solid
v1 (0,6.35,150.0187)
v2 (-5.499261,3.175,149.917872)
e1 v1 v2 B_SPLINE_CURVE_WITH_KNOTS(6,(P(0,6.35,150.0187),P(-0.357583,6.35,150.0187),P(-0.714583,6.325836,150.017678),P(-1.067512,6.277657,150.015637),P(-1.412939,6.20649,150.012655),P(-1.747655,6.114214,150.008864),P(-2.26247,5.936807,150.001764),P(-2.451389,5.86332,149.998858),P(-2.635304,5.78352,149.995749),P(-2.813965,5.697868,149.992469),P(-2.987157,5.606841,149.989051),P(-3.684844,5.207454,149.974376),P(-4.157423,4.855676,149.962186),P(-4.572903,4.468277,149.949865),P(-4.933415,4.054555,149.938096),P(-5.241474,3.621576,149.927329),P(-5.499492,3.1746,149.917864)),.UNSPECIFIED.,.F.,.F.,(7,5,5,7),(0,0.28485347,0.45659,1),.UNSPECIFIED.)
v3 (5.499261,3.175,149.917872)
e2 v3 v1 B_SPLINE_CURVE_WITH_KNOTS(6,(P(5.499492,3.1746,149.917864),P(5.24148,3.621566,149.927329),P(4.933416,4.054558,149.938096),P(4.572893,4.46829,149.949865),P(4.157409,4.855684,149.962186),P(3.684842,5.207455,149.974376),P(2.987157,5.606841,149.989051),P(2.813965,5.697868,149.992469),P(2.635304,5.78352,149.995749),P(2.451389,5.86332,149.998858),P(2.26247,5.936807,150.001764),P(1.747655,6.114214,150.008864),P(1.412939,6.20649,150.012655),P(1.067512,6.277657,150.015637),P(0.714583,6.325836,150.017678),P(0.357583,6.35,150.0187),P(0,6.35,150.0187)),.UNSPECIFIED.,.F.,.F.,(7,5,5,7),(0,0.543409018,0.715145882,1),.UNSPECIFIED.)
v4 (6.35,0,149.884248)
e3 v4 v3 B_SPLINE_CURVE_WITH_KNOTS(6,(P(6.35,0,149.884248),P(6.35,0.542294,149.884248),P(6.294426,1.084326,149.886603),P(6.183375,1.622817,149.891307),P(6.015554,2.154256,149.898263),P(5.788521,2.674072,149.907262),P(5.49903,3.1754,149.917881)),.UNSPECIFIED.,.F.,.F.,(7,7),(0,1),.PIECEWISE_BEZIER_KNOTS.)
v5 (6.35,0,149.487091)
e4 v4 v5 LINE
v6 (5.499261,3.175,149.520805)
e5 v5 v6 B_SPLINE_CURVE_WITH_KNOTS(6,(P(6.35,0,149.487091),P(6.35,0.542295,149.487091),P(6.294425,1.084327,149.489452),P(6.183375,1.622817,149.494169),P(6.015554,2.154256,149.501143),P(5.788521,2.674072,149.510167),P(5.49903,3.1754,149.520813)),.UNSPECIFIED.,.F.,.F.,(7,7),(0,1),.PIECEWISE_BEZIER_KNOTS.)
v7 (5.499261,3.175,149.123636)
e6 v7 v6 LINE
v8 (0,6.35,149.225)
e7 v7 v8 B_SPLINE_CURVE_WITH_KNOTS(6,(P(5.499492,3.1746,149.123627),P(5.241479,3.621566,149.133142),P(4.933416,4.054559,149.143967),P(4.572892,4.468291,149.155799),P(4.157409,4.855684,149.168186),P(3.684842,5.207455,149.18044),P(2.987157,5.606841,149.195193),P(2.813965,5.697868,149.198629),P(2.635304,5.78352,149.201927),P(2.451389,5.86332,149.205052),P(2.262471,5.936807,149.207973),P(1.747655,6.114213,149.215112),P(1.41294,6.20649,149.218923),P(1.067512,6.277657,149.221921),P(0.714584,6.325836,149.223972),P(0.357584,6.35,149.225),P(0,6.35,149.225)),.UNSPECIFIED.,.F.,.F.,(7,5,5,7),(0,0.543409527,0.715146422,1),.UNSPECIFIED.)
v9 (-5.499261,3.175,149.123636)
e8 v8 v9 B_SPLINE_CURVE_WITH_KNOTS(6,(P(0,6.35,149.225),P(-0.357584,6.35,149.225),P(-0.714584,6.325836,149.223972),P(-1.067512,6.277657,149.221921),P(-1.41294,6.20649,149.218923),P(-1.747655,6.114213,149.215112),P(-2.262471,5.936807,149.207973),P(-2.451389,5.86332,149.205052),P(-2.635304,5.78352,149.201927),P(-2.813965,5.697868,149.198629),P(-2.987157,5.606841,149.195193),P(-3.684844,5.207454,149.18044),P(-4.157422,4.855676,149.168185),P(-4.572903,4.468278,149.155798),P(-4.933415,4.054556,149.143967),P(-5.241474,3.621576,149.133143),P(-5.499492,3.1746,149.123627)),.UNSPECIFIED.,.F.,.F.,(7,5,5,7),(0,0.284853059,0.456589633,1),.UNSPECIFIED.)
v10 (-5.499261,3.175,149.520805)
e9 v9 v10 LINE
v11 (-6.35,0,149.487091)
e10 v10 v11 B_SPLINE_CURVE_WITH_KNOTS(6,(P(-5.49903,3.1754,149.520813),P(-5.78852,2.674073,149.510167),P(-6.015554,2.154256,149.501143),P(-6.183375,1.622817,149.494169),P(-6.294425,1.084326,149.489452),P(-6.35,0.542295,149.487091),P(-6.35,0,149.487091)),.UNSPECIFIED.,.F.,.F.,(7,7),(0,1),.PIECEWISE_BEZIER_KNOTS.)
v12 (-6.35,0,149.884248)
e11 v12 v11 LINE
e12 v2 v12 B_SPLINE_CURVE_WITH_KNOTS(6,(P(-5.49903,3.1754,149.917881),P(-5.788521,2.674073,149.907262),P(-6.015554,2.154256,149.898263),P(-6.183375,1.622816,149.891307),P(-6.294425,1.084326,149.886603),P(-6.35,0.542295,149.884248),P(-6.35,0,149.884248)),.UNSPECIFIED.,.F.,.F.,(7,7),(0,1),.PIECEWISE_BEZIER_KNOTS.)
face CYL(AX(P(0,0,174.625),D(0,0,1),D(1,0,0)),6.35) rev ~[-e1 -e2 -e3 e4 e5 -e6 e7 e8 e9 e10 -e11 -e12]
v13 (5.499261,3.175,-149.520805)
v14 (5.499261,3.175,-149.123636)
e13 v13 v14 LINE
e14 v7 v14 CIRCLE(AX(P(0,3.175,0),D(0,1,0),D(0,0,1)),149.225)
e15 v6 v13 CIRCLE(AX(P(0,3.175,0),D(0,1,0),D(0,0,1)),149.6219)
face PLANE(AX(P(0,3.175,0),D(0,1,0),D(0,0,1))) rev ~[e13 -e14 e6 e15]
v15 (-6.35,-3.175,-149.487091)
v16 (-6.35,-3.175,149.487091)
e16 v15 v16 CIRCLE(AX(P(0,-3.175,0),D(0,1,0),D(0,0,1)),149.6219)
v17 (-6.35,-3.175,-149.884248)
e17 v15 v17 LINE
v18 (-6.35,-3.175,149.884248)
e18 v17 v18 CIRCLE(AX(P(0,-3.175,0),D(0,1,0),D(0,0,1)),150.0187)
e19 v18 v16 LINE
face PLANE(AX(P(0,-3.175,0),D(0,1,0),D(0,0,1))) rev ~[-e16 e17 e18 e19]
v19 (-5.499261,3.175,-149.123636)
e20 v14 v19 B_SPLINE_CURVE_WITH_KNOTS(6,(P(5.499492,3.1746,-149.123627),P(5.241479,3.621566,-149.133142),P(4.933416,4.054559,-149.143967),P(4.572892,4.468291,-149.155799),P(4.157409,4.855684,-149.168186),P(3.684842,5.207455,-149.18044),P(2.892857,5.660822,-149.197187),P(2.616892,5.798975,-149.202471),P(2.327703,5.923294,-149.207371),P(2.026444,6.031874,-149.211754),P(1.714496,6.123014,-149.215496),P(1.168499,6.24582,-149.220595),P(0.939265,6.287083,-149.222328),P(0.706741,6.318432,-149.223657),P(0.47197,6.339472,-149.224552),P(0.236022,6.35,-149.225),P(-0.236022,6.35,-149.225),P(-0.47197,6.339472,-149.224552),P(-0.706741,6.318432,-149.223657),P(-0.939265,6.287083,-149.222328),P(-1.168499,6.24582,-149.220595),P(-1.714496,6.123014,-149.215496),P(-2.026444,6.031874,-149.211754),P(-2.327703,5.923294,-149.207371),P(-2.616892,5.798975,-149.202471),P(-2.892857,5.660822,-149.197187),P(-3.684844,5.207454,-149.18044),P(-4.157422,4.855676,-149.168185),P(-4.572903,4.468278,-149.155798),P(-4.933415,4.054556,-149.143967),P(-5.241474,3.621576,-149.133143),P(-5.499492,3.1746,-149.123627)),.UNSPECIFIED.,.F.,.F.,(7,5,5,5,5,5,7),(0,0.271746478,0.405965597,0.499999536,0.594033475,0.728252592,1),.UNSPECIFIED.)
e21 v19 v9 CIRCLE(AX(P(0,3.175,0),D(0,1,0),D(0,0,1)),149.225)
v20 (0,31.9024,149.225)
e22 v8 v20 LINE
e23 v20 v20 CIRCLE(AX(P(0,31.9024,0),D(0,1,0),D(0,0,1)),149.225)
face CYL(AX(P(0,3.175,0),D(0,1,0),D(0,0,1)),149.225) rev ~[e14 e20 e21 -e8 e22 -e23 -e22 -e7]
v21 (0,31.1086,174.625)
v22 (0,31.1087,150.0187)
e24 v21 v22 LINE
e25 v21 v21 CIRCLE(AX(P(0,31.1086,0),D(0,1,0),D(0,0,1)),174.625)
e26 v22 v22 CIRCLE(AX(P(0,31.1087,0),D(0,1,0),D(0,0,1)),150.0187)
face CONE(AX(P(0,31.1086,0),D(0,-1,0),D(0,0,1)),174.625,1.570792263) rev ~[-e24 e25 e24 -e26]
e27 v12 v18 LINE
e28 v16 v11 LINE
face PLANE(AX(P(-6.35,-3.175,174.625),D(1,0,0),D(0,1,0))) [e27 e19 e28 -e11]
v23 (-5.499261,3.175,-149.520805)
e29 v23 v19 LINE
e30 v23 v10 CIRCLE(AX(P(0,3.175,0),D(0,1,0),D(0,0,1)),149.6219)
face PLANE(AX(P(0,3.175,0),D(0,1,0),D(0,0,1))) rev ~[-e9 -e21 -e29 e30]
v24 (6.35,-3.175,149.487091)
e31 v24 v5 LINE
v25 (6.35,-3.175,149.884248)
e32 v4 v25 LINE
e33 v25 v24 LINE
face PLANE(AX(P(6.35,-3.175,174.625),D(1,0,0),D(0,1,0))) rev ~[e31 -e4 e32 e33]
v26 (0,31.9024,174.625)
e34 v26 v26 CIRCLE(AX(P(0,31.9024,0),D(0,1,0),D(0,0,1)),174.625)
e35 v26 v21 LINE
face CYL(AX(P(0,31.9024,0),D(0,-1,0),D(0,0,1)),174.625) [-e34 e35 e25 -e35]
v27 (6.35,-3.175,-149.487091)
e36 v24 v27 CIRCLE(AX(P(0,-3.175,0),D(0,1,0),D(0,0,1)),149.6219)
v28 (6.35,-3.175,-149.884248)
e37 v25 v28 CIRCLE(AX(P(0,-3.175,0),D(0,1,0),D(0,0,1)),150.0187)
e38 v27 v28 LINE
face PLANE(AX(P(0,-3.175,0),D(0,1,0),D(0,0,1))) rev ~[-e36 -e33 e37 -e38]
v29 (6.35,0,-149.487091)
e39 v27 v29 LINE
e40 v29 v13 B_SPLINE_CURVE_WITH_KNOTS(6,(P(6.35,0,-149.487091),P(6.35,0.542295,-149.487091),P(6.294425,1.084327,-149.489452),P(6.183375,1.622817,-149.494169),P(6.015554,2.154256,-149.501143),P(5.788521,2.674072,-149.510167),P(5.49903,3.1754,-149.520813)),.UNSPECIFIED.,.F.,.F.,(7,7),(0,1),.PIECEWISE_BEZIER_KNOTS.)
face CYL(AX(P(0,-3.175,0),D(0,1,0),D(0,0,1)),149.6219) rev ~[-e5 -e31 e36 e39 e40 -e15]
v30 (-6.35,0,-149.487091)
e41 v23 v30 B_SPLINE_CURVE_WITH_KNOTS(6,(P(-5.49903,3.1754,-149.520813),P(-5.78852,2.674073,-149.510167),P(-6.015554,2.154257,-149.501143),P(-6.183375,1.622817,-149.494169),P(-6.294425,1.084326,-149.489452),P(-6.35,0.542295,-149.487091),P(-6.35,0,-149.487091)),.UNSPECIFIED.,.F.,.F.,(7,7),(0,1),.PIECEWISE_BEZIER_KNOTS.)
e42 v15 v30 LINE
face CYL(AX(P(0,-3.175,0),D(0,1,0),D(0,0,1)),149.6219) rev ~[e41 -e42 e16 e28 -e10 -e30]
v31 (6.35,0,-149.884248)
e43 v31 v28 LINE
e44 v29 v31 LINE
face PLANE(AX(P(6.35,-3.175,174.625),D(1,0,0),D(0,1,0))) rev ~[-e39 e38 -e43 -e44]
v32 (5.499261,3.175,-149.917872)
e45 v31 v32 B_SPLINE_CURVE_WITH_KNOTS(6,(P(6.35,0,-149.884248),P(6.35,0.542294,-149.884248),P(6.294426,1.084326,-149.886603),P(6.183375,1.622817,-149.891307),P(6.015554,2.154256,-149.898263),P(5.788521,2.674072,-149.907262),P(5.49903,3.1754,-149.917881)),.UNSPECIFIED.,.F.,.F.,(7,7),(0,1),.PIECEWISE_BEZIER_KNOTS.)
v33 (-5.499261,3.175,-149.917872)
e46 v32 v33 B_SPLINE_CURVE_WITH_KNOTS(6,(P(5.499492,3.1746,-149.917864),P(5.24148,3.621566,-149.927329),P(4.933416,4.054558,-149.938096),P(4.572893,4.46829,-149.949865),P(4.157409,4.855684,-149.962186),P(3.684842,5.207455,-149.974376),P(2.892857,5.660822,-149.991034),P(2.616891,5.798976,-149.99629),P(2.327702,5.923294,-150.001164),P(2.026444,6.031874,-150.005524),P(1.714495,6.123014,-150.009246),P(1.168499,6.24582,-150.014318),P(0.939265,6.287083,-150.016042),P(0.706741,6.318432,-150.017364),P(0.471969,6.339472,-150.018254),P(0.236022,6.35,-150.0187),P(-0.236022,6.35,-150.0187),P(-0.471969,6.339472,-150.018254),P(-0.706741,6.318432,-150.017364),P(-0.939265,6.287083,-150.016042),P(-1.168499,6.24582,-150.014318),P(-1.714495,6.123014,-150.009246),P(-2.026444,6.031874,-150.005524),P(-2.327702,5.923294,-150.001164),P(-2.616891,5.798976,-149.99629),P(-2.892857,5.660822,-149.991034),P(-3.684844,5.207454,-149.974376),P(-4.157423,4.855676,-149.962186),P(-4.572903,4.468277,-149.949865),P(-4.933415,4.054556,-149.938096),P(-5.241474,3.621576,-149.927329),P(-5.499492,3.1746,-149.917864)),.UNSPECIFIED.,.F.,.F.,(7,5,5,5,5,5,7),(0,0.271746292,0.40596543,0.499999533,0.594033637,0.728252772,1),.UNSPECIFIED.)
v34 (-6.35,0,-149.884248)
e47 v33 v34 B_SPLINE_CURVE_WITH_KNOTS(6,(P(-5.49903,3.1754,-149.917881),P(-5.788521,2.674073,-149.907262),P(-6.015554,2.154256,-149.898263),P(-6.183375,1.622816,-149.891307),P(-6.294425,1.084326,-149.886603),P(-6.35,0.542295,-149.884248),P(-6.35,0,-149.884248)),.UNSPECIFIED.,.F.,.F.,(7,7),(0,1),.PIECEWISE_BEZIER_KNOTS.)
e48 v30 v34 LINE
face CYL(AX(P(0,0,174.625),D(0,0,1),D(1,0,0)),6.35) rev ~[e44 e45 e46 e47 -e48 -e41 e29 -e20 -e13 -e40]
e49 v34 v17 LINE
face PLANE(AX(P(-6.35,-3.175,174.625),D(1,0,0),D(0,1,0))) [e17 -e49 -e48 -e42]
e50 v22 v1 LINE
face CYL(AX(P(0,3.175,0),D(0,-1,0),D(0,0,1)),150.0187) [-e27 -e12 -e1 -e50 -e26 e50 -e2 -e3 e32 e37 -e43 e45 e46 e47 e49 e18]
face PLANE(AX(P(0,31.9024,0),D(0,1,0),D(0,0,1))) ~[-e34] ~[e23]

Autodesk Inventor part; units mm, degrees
ref_plane "YZ Plane" through (0, 0, 0) normal (1, 0, 0) x (0, 1, 0)
ref_plane "XZ Plane" through (0, 0, 0) normal (0, 1, 0) x (-1, 0, 0)
sketch "Sketch1" plane through (0, 0, 0) normal (1, 0, 0) x (0, 1, 0)
  line L0 (0, 0) -> (0.4853, 0)
  line L1 (3.175, 149.225) -> (31.9024, 149.225)
  line L2 (31.9024, 149.225) -> (31.9024, 174.625)
  line L3 (31.9024, 174.625) -> (31.1086, 174.625)
  line L4 (31.1086, 174.625) -> (31.1087, 150.0187)
  line L5 (31.1087, 150.0187) -> (3.175, 150.0187)
  line L6 (0, 149.225) -> (-3.175, 149.225)
  line L7 (-3.175, 149.6219) -> (3.175, 149.6219)
  line L8 (3.175, 150.0187) -> (-3.175, 150.0187)
  line L9 (-3.175, 150.0187) -> (-3.175, 149.6219)
  line L10 (3.175, 149.6219) -> (3.175, 149.225)
  point P0 (31.4127, 174.625)
  dimension "d0" = 31.9024
  dimension "d1" = 149.225
  dimension "d2" = 25.4
  dimension "d3" = 0.7937
  dimension "d4" = 24.6062
  dimension "d5" = 3.175
  dimension "d6" = 0.3969
revolve "Revolution1" add sketch "Sketch1" angle 360 about axis through (0, 0, 0) along (0, 1, 0)
ref_plane "Work Plane1" through (0, 31.4127, 174.625) normal (0, 0, 1) x (1, 0, 0)
sketch "Sketch2" plane through (0, 31.4127, 174.625) normal (0, 0, 1) x (1, 0, 0)
  line L0 (149.6219, -34.5877) -> (-149.6219, -34.5877) projected
  arc A0 (6.35, -31.4127) -> (-6.35, -31.4127) centre (0, -31.4127) ccw
  line L1 (-6.35, -34.5877) -> (-6.35, -31.4127)
  line L2 (6.35, -34.5877) -> (6.35, -31.4127)
  line L3 (-6.35, -34.5877) -> (6.35, -34.5877)
  point P0 (0, -31.4127)
  dimension "d10" = 12.7
  dimension "d11" = 0
  dimension "d12" = 3.175
extrude "Extrusion1" cut sketch "Sketch2" against normal through all
properties part number "Layer2_Top"
